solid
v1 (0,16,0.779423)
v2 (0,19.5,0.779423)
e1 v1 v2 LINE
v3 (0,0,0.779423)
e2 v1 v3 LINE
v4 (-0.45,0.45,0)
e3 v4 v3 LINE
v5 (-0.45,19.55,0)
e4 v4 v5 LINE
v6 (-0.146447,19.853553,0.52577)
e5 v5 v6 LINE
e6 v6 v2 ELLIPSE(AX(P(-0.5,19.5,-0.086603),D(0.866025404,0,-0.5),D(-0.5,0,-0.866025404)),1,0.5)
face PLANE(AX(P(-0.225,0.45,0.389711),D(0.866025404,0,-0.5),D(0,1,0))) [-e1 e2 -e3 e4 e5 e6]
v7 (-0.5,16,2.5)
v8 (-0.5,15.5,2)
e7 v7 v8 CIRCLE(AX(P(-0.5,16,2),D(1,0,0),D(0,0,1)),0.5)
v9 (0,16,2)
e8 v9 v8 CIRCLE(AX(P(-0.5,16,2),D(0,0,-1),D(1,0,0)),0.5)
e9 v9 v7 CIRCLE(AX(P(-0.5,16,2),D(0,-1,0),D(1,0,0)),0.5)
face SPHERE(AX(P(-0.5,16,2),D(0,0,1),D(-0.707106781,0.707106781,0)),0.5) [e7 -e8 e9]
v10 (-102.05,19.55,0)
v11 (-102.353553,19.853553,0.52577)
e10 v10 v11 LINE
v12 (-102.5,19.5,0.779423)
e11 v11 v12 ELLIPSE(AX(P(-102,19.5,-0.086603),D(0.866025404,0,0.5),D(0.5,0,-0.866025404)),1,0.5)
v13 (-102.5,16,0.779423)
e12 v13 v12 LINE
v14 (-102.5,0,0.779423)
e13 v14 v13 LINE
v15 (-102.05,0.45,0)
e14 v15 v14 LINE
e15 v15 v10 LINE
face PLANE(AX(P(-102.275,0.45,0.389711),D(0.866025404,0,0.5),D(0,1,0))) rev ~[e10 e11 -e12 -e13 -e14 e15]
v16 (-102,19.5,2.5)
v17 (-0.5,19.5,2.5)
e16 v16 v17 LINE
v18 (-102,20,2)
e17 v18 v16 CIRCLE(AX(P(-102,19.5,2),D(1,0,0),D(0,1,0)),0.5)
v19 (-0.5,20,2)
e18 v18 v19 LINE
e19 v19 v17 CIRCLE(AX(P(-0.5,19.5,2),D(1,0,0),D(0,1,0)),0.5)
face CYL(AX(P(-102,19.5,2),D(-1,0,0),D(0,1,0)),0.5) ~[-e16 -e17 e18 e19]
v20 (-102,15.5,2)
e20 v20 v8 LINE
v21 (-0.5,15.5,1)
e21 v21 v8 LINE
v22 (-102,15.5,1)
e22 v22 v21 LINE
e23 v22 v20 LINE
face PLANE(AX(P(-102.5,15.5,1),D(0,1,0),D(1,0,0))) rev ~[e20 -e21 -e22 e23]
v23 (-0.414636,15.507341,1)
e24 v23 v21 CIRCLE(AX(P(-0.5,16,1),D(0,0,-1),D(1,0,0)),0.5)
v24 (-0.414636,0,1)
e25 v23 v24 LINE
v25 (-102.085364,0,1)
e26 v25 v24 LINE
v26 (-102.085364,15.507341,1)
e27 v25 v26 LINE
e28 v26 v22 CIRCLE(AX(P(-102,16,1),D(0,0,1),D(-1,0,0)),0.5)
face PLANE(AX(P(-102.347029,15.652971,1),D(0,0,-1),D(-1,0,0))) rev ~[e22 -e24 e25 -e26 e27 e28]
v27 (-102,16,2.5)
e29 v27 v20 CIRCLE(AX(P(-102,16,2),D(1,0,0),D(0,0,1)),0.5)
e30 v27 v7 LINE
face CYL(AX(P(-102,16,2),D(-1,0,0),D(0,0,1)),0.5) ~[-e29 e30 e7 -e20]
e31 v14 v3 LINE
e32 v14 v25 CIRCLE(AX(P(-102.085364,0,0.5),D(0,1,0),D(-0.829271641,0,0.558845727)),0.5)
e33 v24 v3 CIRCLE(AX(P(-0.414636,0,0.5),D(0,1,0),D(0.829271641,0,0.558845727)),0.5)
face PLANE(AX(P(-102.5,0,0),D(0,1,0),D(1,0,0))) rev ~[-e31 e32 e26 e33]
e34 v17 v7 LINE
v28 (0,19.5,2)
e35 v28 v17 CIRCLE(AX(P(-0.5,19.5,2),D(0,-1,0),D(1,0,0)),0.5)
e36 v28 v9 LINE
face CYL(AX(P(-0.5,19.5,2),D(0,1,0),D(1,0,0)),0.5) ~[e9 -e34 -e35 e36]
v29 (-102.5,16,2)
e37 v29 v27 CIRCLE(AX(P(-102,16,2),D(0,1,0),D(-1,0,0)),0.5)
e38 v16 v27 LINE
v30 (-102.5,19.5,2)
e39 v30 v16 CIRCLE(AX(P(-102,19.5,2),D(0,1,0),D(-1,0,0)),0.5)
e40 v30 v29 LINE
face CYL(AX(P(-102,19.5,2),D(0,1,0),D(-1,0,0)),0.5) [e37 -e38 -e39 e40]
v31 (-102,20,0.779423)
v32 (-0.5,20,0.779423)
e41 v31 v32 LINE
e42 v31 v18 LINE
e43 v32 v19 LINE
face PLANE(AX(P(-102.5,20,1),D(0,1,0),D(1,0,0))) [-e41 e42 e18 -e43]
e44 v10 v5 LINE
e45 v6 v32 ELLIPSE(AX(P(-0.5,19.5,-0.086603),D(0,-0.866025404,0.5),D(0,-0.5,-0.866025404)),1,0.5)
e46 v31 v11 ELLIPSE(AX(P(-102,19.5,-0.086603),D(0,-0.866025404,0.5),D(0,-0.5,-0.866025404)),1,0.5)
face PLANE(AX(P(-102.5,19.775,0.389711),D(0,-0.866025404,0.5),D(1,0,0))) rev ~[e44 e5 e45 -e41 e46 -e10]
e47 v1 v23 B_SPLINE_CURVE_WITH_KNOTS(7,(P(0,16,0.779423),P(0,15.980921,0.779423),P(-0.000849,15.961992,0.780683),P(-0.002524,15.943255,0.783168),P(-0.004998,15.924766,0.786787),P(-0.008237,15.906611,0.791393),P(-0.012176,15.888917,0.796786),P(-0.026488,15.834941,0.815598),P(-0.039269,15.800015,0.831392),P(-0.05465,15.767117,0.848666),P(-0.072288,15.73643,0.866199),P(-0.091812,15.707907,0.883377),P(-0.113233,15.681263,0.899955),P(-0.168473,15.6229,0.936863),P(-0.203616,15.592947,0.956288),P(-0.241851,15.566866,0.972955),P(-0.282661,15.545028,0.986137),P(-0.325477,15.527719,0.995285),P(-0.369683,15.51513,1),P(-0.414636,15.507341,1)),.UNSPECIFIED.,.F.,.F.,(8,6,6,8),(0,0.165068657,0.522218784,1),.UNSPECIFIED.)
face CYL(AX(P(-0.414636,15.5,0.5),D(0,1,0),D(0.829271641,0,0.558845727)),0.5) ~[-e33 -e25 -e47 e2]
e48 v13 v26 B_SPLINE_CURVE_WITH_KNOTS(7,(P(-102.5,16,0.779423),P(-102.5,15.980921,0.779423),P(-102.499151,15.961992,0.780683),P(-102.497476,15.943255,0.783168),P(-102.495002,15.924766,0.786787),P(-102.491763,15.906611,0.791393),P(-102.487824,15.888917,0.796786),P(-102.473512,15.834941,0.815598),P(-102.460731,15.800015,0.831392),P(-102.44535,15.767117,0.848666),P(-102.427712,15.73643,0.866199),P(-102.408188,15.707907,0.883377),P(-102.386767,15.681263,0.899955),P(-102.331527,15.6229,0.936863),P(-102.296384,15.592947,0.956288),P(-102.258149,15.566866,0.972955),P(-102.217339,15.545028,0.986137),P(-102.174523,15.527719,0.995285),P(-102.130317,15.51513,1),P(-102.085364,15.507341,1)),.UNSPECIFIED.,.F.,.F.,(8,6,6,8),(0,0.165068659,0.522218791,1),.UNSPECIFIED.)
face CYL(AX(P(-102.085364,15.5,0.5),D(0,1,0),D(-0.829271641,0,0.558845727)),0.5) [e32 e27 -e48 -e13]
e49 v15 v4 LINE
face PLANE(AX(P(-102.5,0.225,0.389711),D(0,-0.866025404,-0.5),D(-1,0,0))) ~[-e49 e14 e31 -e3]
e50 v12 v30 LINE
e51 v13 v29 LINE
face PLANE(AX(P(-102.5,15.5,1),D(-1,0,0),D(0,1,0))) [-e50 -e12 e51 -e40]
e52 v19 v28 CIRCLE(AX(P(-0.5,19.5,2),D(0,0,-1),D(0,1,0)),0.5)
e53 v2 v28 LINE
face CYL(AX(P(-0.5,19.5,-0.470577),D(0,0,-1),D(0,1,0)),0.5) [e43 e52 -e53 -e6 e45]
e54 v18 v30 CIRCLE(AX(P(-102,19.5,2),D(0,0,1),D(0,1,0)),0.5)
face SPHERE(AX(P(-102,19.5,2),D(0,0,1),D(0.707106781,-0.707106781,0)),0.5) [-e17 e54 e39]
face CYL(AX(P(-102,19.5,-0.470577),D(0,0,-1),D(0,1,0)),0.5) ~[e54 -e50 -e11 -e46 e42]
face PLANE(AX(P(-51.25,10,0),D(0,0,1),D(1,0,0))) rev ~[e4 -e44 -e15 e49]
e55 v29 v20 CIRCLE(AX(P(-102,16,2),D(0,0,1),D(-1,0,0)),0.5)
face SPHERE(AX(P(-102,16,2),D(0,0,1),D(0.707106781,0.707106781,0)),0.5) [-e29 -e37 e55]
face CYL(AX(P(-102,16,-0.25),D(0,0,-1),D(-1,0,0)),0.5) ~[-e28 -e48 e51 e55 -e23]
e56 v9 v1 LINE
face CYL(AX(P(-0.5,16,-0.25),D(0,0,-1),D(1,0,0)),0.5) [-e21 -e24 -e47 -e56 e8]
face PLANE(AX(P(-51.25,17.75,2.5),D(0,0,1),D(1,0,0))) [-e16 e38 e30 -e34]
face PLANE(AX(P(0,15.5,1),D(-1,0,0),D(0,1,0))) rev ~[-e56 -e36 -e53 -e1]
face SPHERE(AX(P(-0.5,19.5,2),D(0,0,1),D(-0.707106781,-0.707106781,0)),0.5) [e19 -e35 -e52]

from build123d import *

# Parameters (mm, degrees)
F0_W         = 102.5
F0_H         = 20
F1_DEPTH     = 1
F2_W         = 102.5
F2_H         = 4.5
F3_DEPTH     = 1.5
F4_C1_SIZE2  = 0.45
F4_C1_SIZE   = 0.7794228634
F4_C2_SIZE2  = 0.7794228634
F4_C2_SIZE   = 0.45
F4_C3_SIZE2  = 0.7794228634
F4_C3_SIZE   = 0.45
F4_C4_SIZE2  = 0.7794228634
F4_C4_SIZE   = 0.45
F5_T1_DEPTH  = 2.4705771366
F5_T3_DEPTH  = 1
F5_T5_DEPTH  = 3.5
F5_T7_DEPTH  = 101.5
F5_T9_DEPTH  = 16.5365895505
F5_S13_W     = 0.51
F5_S13_H     = 0.51
F5_T14_DEPTH = 0.51
F5_S19_W     = 0.51
F5_S19_H     = 0.51
F5_T20_DEPTH = 0.51
F5_S25_W     = 0.51
F5_S25_H     = 0.51
F5_T26_DEPTH = 0.51
F5_S31_W     = 0.51
F5_S31_H     = 0.51
F5_T32_DEPTH = 0.51
F5_T39_DEPTH = 16.5365895505
F5_T43_DEPTH = 2.25
F5_T52_DEPTH = 16.5365895505
F5_T56_DEPTH = 2.25


# Not quite as in the source:
# - a fillet or chamfer that OpenCascade refuses, or shapes differently, is made with other operations: its cross-section is extruded or revolved along the edge and cut away or added


with BuildPart() as f1:
    # F0 (on Top) → F1 (new body)
    with BuildSketch(Plane.XY):
        with Locations((-51.25, 10)):
            Rectangle(F0_W, F0_H)
    extrude(amount=F1_DEPTH)

    # F2 (on face) → F3 (join)
    with BuildSketch(Plane.XY.offset(1)):
        with Locations((-51.25, 17.75)):
            Rectangle(F2_W, F2_H)
    extrude(amount=F3_DEPTH)

    # F4: chamfer of 0.45 x 0.7794228634 on 4 edges, made by hand

    # F4_c1
    f4_c1_edges = [f1.edges().sort_by_distance(p)[0] for p in [
        (-51.25, 0, 0),
    ]]
    f4_c1_side = f1.faces().sort_by_distance((-51.25, 0, 0.009))[0]
    chamfer(f4_c1_edges, length=F4_C1_SIZE, length2=F4_C1_SIZE2, reference=f4_c1_side)

    # F4_c2
    f4_c2_edges = [f1.edges().sort_by_distance(p)[0] for p in [
        (-51.25, 20, 0),
    ]]
    f4_c2_side = f1.faces().sort_by_distance((-51.25, 19.991, 0))[0]
    chamfer(f4_c2_edges, length=F4_C2_SIZE, length2=F4_C2_SIZE2, reference=f4_c2_side)

    # F4_c3
    f4_c3_edges = [f1.edges().sort_by_distance(p)[0] for p in [
        (0, 10, 0),
    ]]
    f4_c3_side = f1.faces().sort_by_distance((-0.009, 10, 0))[0]
    chamfer(f4_c3_edges, length=F4_C3_SIZE, length2=F4_C3_SIZE2, reference=f4_c3_side)

    # F4_c4
    f4_c4_edges = [f1.edges().sort_by_distance(p)[0] for p in [
        (-102.5, 10, 0),
    ]]
    f4_c4_side = f1.faces().sort_by_distance((-102.491, 10, 0))[0]
    chamfer(f4_c4_edges, length=F4_C4_SIZE, length2=F4_C4_SIZE2, reference=f4_c4_side)

    # F5: fillet of radius 0.5 on 10 edges, made by hand

    # F5_s2 → F5_t1 (cut)
    with BuildSketch(Plane.XY.offset(-0.4705771366)):
        with BuildLine():
            ThreePointArc((-102, 20), (-102.3535533906, 19.8535533906), (-102.5, 19.5))
            Line((-102.5, 19.5), (-102.5, 20))
            Line((-102.5, 20), (-102, 20))
        make_face()
        with BuildLine():
            ThreePointArc((-0.5, 20), (-0.1464466094, 19.8535533906), (0, 19.5))
            Line((0, 19.5), (0, 20))
            Line((0, 20), (-0.5, 20))
        make_face()
    extrude(amount=F5_T1_DEPTH, mode=Mode.SUBTRACT)

    # F5_s4 → F5_t3 (cut)
    with BuildSketch(Plane.XY.offset(1)):
        with BuildLine():
            ThreePointArc((-102.5, 16), (-102.3535533906, 15.6464466094), (-102, 15.5))
            Line((-102, 15.5), (-102.5, 15.5))
            Line((-102.5, 15.5), (-102.5, 16))
        make_face()
        with BuildLine():
            ThreePointArc((0, 16), (-0.1464466094, 15.6464466094), (-0.5, 15.5))
            Line((-0.5, 15.5), (0, 15.5))
            Line((0, 15.5), (0, 16))
        make_face()
    extrude(amount=F5_T3_DEPTH, mode=Mode.SUBTRACT)

    # F5_s6 → F5_t5 (cut)
    with BuildSketch(Plane.XZ.offset(-19.5)):
        with BuildLine():
            ThreePointArc((-102.5, 2), (-102.3535533906, 2.3535533906), (-102, 2.5))
            Line((-102, 2.5), (-102.5, 2.5))
            Line((-102.5, 2.5), (-102.5, 2))
        make_face()
        with BuildLine():
            ThreePointArc((0, 2), (-0.1464466094, 2.3535533906), (-0.5, 2.5))
            Line((-0.5, 2.5), (0, 2.5))
            Line((0, 2.5), (0, 2))
        make_face()
    extrude(amount=F5_T5_DEPTH, mode=Mode.SUBTRACT)

    # F5_s8 → F5_t7 (cut)
    with BuildSketch(Plane.YZ.offset(-102)):
        with BuildLine():
            ThreePointArc((20, 2), (19.8535533906, 2.3535533906), (19.5, 2.5))
            Line((19.5, 2.5), (20, 2.5))
            Line((20, 2.5), (20, 2))
        make_face()
        with BuildLine():
            ThreePointArc((16, 2.5), (15.6464466094, 2.3535533906), (15.5, 2))
            Line((15.5, 2), (15.5, 2.5))
            Line((15.5, 2.5), (16, 2.5))
        make_face()
    extrude(amount=F5_T7_DEPTH, mode=Mode.SUBTRACT)

    # F5_s10 → F5_t9 (cut)
    with BuildSketch(Plane.XZ.offset(-15.5)):
        with BuildLine():
            ThreePointArc((-102.5, 0.7794228634), (-102.3201923811, 0.9414246435), (-102.0853641798, 1))
            Line((-102.0853641798, 1), (-102.5, 1))
            Line((-102.5, 1), (-102.5, 0.7794228634))
        make_face()
        with BuildLine():
            ThreePointArc((0, 0.7794228634), (-0.1798076189, 0.9414246435), (-0.4146358202, 1))
            Line((-0.4146358202, 1), (0, 1))
            Line((0, 1), (0, 0.7794228634))
        make_face()
    extrude(amount=F5_T9_DEPTH, mode=Mode.SUBTRACT)


with BuildPart() as f5_tool12:
    # F5_s13 → F5_t14 (new body)
    with BuildSketch(Plane.XY.offset(2)):
        with Locations((-102.255, 19.755)):
            Rectangle(F5_S13_W, F5_S13_H)
    extrude(amount=F5_T14_DEPTH)

    # F5_s15 → F5_t16 (revolve, cut)
    with BuildSketch(Plane(origin=(-102, 19.5, 2), x_dir=(0.7071067812, -0.7071067812, 0), z_dir=(-0.7071067812, -0.7071067812, 0))):
        with BuildLine():
            ThreePointArc((0, -0.5), (0.5, 0), (0, 0.5))
            Line((0, 0.5), (0, -0.5))
        make_face()
    revolve(axis=Axis((-102, 19.5, 2), (0, 0, 1)), mode=Mode.SUBTRACT)


with BuildPart() as f1_1:
    add(f1.part)

    # F5_t11: cut F5_tool12
    add(f5_tool12.part, mode=Mode.SUBTRACT)


with BuildPart() as f5_tool18:
    # F5_s19 → F5_t20 (new body)
    with BuildSketch(Plane.XY.offset(2)):
        with Locations((-102.255, 15.745)):
            Rectangle(F5_S19_W, F5_S19_H)
    extrude(amount=F5_T20_DEPTH)

    # F5_s21 → F5_t22 (revolve, cut)
    with BuildSketch(Plane(origin=(-102, 16, 2), x_dir=(0.7071067812, 0.7071067812, 0), z_dir=(0.7071067812, -0.7071067812, 0))):
        with BuildLine():
            ThreePointArc((0, -0.5), (0.5, 0), (0, 0.5))
            Line((0, 0.5), (0, -0.5))
        make_face()
    revolve(axis=Axis((-102, 16, 2), (0, 0, 1)), mode=Mode.SUBTRACT)


with BuildPart() as f1_2:
    add(f1_1.part)

    # F5_t17: cut F5_tool18
    add(f5_tool18.part, mode=Mode.SUBTRACT)


with BuildPart() as f5_tool24:
    # F5_s25 → F5_t26 (new body)
    with BuildSketch(Plane.XY.offset(2)):
        with Locations((-0.245, 19.755)):
            Rectangle(F5_S25_W, F5_S25_H)
    extrude(amount=F5_T26_DEPTH)

    # F5_s27 → F5_t28 (revolve, cut)
    with BuildSketch(Plane(origin=(-0.5, 19.5, 2), x_dir=(-0.7071067812, -0.7071067812, 0), z_dir=(-0.7071067812, 0.7071067812, 0))):
        with BuildLine():
            ThreePointArc((0, -0.5), (0.5, 0), (0, 0.5))
            Line((0, 0.5), (0, -0.5))
        make_face()
    revolve(axis=Axis((-0.5, 19.5, 2), (0, 0, 1)), mode=Mode.SUBTRACT)


with BuildPart() as f1_3:
    add(f1_2.part)

    # F5_t23: cut F5_tool24
    add(f5_tool24.part, mode=Mode.SUBTRACT)


with BuildPart() as f5_tool30:
    # F5_s31 → F5_t32 (new body)
    with BuildSketch(Plane.XY.offset(2)):
        with Locations((-0.245, 15.745)):
            Rectangle(F5_S31_W, F5_S31_H)
    extrude(amount=F5_T32_DEPTH)

    # F5_s33 → F5_t34 (revolve, cut)
    with BuildSketch(Plane(origin=(-0.5, 16, 2), x_dir=(-0.7071067812, 0.7071067812, 0), z_dir=(0.7071067812, 0.7071067812, 0))):
        with BuildLine():
            ThreePointArc((0, -0.5), (0.5, 0), (0, 0.5))
            Line((0, 0.5), (0, -0.5))
        make_face()
    revolve(axis=Axis((-0.5, 16, 2), (0, 0, 1)), mode=Mode.SUBTRACT)


with BuildPart() as f1_4:
    add(f1_3.part)

    # F5_t29: cut F5_tool30
    add(f5_tool30.part, mode=Mode.SUBTRACT)


with BuildPart() as f5_tool37:
    # F5_s38 → F5_t39 (new body)
    with BuildSketch(Plane.XZ.offset(-16.5365895505)):
        with BuildLine():
            ThreePointArc((-102.5, 0.7794228634), (-102.3201923811, 0.9414246435), (-102.0853641798, 1))
            Line((-102.0853641798, 1), (-102.5, 1))
            Line((-102.5, 1), (-102.5, 0.7794228634))
        make_face()
    extrude(amount=F5_T39_DEPTH)

    split(bisect_by=Plane.XZ.offset(-15.5), keep=Keep.BOTTOM)


with BuildPart() as f5_tool41:
    # F5_s42 → F5_t43 (new body)
    with BuildSketch(Plane.XY.offset(-0.25)):
        with BuildLine():
            ThreePointArc((-102.5, 16), (-102.3535533906, 15.6464466094), (-102, 15.5))
            Line((-102, 15.5), (-102.5, 15.5))
            Line((-102.5, 15.5), (-102.5, 16))
        make_face()
    extrude(amount=F5_T43_DEPTH)

    split(bisect_by=Plane.XY, keep=Keep.TOP)

    split(bisect_by=Plane(origin=(-76.5375, 0, -44.1889462281), x_dir=(0, 1, 0), z_dir=(0.8660254038, 0, 0.5)), keep=Keep.TOP)

    split(bisect_by=Plane.XY.offset(1), keep=Keep.BOTTOM)


with BuildPart() as f5_tool37_1:
    add(f5_tool37.part)

    # F5_t47: intersect F5_tool41
    add(f5_tool41.part, mode=Mode.INTERSECT)


with BuildPart() as f1_5:
    add(f1_4.part)

    # F5_t35: cut F5_tool37
    add(f5_tool37_1.part, mode=Mode.SUBTRACT)


with BuildPart() as f5_tool50:
    # F5_s51 → F5_t52 (new body)
    with BuildSketch(Plane.XZ):
        with BuildLine():
            ThreePointArc((0, 0.7794228634), (-0.1798076189, 0.9414246435), (-0.4146358202, 1))
            Line((-0.4146358202, 1), (0, 1))
            Line((0, 1), (0, 0.7794228634))
        make_face()
    extrude(amount=-F5_T52_DEPTH)

    split(bisect_by=Plane.XZ.offset(-15.5), keep=Keep.BOTTOM)


with BuildPart() as f5_tool54:
    # F5_s55 → F5_t56 (new body)
    with BuildSketch(Plane.XY.offset(-0.25)):
        with BuildLine():
            ThreePointArc((0, 16), (-0.1464466094, 15.6464466094), (-0.5, 15.5))
            Line((-0.5, 15.5), (0, 15.5))
            Line((0, 15.5), (0, 16))
        make_face()
    extrude(amount=F5_T56_DEPTH)

    split(bisect_by=Plane.XY, keep=Keep.TOP)

    split(bisect_by=Plane(origin=(-0.3375, 0, 0.1948557159), x_dir=(0, 1, 0), z_dir=(-0.8660254038, 0, 0.5)), keep=Keep.TOP)

    split(bisect_by=Plane.XY.offset(1), keep=Keep.BOTTOM)


with BuildPart() as f5_tool50_1:
    add(f5_tool50.part)

    # F5_t60: intersect F5_tool54
    add(f5_tool54.part, mode=Mode.INTERSECT)


with BuildPart() as f1_6:
    add(f1_5.part)

    # F5_t48: cut F5_tool50
    add(f5_tool50_1.part, mode=Mode.SUBTRACT)


solid = f1_6.part
